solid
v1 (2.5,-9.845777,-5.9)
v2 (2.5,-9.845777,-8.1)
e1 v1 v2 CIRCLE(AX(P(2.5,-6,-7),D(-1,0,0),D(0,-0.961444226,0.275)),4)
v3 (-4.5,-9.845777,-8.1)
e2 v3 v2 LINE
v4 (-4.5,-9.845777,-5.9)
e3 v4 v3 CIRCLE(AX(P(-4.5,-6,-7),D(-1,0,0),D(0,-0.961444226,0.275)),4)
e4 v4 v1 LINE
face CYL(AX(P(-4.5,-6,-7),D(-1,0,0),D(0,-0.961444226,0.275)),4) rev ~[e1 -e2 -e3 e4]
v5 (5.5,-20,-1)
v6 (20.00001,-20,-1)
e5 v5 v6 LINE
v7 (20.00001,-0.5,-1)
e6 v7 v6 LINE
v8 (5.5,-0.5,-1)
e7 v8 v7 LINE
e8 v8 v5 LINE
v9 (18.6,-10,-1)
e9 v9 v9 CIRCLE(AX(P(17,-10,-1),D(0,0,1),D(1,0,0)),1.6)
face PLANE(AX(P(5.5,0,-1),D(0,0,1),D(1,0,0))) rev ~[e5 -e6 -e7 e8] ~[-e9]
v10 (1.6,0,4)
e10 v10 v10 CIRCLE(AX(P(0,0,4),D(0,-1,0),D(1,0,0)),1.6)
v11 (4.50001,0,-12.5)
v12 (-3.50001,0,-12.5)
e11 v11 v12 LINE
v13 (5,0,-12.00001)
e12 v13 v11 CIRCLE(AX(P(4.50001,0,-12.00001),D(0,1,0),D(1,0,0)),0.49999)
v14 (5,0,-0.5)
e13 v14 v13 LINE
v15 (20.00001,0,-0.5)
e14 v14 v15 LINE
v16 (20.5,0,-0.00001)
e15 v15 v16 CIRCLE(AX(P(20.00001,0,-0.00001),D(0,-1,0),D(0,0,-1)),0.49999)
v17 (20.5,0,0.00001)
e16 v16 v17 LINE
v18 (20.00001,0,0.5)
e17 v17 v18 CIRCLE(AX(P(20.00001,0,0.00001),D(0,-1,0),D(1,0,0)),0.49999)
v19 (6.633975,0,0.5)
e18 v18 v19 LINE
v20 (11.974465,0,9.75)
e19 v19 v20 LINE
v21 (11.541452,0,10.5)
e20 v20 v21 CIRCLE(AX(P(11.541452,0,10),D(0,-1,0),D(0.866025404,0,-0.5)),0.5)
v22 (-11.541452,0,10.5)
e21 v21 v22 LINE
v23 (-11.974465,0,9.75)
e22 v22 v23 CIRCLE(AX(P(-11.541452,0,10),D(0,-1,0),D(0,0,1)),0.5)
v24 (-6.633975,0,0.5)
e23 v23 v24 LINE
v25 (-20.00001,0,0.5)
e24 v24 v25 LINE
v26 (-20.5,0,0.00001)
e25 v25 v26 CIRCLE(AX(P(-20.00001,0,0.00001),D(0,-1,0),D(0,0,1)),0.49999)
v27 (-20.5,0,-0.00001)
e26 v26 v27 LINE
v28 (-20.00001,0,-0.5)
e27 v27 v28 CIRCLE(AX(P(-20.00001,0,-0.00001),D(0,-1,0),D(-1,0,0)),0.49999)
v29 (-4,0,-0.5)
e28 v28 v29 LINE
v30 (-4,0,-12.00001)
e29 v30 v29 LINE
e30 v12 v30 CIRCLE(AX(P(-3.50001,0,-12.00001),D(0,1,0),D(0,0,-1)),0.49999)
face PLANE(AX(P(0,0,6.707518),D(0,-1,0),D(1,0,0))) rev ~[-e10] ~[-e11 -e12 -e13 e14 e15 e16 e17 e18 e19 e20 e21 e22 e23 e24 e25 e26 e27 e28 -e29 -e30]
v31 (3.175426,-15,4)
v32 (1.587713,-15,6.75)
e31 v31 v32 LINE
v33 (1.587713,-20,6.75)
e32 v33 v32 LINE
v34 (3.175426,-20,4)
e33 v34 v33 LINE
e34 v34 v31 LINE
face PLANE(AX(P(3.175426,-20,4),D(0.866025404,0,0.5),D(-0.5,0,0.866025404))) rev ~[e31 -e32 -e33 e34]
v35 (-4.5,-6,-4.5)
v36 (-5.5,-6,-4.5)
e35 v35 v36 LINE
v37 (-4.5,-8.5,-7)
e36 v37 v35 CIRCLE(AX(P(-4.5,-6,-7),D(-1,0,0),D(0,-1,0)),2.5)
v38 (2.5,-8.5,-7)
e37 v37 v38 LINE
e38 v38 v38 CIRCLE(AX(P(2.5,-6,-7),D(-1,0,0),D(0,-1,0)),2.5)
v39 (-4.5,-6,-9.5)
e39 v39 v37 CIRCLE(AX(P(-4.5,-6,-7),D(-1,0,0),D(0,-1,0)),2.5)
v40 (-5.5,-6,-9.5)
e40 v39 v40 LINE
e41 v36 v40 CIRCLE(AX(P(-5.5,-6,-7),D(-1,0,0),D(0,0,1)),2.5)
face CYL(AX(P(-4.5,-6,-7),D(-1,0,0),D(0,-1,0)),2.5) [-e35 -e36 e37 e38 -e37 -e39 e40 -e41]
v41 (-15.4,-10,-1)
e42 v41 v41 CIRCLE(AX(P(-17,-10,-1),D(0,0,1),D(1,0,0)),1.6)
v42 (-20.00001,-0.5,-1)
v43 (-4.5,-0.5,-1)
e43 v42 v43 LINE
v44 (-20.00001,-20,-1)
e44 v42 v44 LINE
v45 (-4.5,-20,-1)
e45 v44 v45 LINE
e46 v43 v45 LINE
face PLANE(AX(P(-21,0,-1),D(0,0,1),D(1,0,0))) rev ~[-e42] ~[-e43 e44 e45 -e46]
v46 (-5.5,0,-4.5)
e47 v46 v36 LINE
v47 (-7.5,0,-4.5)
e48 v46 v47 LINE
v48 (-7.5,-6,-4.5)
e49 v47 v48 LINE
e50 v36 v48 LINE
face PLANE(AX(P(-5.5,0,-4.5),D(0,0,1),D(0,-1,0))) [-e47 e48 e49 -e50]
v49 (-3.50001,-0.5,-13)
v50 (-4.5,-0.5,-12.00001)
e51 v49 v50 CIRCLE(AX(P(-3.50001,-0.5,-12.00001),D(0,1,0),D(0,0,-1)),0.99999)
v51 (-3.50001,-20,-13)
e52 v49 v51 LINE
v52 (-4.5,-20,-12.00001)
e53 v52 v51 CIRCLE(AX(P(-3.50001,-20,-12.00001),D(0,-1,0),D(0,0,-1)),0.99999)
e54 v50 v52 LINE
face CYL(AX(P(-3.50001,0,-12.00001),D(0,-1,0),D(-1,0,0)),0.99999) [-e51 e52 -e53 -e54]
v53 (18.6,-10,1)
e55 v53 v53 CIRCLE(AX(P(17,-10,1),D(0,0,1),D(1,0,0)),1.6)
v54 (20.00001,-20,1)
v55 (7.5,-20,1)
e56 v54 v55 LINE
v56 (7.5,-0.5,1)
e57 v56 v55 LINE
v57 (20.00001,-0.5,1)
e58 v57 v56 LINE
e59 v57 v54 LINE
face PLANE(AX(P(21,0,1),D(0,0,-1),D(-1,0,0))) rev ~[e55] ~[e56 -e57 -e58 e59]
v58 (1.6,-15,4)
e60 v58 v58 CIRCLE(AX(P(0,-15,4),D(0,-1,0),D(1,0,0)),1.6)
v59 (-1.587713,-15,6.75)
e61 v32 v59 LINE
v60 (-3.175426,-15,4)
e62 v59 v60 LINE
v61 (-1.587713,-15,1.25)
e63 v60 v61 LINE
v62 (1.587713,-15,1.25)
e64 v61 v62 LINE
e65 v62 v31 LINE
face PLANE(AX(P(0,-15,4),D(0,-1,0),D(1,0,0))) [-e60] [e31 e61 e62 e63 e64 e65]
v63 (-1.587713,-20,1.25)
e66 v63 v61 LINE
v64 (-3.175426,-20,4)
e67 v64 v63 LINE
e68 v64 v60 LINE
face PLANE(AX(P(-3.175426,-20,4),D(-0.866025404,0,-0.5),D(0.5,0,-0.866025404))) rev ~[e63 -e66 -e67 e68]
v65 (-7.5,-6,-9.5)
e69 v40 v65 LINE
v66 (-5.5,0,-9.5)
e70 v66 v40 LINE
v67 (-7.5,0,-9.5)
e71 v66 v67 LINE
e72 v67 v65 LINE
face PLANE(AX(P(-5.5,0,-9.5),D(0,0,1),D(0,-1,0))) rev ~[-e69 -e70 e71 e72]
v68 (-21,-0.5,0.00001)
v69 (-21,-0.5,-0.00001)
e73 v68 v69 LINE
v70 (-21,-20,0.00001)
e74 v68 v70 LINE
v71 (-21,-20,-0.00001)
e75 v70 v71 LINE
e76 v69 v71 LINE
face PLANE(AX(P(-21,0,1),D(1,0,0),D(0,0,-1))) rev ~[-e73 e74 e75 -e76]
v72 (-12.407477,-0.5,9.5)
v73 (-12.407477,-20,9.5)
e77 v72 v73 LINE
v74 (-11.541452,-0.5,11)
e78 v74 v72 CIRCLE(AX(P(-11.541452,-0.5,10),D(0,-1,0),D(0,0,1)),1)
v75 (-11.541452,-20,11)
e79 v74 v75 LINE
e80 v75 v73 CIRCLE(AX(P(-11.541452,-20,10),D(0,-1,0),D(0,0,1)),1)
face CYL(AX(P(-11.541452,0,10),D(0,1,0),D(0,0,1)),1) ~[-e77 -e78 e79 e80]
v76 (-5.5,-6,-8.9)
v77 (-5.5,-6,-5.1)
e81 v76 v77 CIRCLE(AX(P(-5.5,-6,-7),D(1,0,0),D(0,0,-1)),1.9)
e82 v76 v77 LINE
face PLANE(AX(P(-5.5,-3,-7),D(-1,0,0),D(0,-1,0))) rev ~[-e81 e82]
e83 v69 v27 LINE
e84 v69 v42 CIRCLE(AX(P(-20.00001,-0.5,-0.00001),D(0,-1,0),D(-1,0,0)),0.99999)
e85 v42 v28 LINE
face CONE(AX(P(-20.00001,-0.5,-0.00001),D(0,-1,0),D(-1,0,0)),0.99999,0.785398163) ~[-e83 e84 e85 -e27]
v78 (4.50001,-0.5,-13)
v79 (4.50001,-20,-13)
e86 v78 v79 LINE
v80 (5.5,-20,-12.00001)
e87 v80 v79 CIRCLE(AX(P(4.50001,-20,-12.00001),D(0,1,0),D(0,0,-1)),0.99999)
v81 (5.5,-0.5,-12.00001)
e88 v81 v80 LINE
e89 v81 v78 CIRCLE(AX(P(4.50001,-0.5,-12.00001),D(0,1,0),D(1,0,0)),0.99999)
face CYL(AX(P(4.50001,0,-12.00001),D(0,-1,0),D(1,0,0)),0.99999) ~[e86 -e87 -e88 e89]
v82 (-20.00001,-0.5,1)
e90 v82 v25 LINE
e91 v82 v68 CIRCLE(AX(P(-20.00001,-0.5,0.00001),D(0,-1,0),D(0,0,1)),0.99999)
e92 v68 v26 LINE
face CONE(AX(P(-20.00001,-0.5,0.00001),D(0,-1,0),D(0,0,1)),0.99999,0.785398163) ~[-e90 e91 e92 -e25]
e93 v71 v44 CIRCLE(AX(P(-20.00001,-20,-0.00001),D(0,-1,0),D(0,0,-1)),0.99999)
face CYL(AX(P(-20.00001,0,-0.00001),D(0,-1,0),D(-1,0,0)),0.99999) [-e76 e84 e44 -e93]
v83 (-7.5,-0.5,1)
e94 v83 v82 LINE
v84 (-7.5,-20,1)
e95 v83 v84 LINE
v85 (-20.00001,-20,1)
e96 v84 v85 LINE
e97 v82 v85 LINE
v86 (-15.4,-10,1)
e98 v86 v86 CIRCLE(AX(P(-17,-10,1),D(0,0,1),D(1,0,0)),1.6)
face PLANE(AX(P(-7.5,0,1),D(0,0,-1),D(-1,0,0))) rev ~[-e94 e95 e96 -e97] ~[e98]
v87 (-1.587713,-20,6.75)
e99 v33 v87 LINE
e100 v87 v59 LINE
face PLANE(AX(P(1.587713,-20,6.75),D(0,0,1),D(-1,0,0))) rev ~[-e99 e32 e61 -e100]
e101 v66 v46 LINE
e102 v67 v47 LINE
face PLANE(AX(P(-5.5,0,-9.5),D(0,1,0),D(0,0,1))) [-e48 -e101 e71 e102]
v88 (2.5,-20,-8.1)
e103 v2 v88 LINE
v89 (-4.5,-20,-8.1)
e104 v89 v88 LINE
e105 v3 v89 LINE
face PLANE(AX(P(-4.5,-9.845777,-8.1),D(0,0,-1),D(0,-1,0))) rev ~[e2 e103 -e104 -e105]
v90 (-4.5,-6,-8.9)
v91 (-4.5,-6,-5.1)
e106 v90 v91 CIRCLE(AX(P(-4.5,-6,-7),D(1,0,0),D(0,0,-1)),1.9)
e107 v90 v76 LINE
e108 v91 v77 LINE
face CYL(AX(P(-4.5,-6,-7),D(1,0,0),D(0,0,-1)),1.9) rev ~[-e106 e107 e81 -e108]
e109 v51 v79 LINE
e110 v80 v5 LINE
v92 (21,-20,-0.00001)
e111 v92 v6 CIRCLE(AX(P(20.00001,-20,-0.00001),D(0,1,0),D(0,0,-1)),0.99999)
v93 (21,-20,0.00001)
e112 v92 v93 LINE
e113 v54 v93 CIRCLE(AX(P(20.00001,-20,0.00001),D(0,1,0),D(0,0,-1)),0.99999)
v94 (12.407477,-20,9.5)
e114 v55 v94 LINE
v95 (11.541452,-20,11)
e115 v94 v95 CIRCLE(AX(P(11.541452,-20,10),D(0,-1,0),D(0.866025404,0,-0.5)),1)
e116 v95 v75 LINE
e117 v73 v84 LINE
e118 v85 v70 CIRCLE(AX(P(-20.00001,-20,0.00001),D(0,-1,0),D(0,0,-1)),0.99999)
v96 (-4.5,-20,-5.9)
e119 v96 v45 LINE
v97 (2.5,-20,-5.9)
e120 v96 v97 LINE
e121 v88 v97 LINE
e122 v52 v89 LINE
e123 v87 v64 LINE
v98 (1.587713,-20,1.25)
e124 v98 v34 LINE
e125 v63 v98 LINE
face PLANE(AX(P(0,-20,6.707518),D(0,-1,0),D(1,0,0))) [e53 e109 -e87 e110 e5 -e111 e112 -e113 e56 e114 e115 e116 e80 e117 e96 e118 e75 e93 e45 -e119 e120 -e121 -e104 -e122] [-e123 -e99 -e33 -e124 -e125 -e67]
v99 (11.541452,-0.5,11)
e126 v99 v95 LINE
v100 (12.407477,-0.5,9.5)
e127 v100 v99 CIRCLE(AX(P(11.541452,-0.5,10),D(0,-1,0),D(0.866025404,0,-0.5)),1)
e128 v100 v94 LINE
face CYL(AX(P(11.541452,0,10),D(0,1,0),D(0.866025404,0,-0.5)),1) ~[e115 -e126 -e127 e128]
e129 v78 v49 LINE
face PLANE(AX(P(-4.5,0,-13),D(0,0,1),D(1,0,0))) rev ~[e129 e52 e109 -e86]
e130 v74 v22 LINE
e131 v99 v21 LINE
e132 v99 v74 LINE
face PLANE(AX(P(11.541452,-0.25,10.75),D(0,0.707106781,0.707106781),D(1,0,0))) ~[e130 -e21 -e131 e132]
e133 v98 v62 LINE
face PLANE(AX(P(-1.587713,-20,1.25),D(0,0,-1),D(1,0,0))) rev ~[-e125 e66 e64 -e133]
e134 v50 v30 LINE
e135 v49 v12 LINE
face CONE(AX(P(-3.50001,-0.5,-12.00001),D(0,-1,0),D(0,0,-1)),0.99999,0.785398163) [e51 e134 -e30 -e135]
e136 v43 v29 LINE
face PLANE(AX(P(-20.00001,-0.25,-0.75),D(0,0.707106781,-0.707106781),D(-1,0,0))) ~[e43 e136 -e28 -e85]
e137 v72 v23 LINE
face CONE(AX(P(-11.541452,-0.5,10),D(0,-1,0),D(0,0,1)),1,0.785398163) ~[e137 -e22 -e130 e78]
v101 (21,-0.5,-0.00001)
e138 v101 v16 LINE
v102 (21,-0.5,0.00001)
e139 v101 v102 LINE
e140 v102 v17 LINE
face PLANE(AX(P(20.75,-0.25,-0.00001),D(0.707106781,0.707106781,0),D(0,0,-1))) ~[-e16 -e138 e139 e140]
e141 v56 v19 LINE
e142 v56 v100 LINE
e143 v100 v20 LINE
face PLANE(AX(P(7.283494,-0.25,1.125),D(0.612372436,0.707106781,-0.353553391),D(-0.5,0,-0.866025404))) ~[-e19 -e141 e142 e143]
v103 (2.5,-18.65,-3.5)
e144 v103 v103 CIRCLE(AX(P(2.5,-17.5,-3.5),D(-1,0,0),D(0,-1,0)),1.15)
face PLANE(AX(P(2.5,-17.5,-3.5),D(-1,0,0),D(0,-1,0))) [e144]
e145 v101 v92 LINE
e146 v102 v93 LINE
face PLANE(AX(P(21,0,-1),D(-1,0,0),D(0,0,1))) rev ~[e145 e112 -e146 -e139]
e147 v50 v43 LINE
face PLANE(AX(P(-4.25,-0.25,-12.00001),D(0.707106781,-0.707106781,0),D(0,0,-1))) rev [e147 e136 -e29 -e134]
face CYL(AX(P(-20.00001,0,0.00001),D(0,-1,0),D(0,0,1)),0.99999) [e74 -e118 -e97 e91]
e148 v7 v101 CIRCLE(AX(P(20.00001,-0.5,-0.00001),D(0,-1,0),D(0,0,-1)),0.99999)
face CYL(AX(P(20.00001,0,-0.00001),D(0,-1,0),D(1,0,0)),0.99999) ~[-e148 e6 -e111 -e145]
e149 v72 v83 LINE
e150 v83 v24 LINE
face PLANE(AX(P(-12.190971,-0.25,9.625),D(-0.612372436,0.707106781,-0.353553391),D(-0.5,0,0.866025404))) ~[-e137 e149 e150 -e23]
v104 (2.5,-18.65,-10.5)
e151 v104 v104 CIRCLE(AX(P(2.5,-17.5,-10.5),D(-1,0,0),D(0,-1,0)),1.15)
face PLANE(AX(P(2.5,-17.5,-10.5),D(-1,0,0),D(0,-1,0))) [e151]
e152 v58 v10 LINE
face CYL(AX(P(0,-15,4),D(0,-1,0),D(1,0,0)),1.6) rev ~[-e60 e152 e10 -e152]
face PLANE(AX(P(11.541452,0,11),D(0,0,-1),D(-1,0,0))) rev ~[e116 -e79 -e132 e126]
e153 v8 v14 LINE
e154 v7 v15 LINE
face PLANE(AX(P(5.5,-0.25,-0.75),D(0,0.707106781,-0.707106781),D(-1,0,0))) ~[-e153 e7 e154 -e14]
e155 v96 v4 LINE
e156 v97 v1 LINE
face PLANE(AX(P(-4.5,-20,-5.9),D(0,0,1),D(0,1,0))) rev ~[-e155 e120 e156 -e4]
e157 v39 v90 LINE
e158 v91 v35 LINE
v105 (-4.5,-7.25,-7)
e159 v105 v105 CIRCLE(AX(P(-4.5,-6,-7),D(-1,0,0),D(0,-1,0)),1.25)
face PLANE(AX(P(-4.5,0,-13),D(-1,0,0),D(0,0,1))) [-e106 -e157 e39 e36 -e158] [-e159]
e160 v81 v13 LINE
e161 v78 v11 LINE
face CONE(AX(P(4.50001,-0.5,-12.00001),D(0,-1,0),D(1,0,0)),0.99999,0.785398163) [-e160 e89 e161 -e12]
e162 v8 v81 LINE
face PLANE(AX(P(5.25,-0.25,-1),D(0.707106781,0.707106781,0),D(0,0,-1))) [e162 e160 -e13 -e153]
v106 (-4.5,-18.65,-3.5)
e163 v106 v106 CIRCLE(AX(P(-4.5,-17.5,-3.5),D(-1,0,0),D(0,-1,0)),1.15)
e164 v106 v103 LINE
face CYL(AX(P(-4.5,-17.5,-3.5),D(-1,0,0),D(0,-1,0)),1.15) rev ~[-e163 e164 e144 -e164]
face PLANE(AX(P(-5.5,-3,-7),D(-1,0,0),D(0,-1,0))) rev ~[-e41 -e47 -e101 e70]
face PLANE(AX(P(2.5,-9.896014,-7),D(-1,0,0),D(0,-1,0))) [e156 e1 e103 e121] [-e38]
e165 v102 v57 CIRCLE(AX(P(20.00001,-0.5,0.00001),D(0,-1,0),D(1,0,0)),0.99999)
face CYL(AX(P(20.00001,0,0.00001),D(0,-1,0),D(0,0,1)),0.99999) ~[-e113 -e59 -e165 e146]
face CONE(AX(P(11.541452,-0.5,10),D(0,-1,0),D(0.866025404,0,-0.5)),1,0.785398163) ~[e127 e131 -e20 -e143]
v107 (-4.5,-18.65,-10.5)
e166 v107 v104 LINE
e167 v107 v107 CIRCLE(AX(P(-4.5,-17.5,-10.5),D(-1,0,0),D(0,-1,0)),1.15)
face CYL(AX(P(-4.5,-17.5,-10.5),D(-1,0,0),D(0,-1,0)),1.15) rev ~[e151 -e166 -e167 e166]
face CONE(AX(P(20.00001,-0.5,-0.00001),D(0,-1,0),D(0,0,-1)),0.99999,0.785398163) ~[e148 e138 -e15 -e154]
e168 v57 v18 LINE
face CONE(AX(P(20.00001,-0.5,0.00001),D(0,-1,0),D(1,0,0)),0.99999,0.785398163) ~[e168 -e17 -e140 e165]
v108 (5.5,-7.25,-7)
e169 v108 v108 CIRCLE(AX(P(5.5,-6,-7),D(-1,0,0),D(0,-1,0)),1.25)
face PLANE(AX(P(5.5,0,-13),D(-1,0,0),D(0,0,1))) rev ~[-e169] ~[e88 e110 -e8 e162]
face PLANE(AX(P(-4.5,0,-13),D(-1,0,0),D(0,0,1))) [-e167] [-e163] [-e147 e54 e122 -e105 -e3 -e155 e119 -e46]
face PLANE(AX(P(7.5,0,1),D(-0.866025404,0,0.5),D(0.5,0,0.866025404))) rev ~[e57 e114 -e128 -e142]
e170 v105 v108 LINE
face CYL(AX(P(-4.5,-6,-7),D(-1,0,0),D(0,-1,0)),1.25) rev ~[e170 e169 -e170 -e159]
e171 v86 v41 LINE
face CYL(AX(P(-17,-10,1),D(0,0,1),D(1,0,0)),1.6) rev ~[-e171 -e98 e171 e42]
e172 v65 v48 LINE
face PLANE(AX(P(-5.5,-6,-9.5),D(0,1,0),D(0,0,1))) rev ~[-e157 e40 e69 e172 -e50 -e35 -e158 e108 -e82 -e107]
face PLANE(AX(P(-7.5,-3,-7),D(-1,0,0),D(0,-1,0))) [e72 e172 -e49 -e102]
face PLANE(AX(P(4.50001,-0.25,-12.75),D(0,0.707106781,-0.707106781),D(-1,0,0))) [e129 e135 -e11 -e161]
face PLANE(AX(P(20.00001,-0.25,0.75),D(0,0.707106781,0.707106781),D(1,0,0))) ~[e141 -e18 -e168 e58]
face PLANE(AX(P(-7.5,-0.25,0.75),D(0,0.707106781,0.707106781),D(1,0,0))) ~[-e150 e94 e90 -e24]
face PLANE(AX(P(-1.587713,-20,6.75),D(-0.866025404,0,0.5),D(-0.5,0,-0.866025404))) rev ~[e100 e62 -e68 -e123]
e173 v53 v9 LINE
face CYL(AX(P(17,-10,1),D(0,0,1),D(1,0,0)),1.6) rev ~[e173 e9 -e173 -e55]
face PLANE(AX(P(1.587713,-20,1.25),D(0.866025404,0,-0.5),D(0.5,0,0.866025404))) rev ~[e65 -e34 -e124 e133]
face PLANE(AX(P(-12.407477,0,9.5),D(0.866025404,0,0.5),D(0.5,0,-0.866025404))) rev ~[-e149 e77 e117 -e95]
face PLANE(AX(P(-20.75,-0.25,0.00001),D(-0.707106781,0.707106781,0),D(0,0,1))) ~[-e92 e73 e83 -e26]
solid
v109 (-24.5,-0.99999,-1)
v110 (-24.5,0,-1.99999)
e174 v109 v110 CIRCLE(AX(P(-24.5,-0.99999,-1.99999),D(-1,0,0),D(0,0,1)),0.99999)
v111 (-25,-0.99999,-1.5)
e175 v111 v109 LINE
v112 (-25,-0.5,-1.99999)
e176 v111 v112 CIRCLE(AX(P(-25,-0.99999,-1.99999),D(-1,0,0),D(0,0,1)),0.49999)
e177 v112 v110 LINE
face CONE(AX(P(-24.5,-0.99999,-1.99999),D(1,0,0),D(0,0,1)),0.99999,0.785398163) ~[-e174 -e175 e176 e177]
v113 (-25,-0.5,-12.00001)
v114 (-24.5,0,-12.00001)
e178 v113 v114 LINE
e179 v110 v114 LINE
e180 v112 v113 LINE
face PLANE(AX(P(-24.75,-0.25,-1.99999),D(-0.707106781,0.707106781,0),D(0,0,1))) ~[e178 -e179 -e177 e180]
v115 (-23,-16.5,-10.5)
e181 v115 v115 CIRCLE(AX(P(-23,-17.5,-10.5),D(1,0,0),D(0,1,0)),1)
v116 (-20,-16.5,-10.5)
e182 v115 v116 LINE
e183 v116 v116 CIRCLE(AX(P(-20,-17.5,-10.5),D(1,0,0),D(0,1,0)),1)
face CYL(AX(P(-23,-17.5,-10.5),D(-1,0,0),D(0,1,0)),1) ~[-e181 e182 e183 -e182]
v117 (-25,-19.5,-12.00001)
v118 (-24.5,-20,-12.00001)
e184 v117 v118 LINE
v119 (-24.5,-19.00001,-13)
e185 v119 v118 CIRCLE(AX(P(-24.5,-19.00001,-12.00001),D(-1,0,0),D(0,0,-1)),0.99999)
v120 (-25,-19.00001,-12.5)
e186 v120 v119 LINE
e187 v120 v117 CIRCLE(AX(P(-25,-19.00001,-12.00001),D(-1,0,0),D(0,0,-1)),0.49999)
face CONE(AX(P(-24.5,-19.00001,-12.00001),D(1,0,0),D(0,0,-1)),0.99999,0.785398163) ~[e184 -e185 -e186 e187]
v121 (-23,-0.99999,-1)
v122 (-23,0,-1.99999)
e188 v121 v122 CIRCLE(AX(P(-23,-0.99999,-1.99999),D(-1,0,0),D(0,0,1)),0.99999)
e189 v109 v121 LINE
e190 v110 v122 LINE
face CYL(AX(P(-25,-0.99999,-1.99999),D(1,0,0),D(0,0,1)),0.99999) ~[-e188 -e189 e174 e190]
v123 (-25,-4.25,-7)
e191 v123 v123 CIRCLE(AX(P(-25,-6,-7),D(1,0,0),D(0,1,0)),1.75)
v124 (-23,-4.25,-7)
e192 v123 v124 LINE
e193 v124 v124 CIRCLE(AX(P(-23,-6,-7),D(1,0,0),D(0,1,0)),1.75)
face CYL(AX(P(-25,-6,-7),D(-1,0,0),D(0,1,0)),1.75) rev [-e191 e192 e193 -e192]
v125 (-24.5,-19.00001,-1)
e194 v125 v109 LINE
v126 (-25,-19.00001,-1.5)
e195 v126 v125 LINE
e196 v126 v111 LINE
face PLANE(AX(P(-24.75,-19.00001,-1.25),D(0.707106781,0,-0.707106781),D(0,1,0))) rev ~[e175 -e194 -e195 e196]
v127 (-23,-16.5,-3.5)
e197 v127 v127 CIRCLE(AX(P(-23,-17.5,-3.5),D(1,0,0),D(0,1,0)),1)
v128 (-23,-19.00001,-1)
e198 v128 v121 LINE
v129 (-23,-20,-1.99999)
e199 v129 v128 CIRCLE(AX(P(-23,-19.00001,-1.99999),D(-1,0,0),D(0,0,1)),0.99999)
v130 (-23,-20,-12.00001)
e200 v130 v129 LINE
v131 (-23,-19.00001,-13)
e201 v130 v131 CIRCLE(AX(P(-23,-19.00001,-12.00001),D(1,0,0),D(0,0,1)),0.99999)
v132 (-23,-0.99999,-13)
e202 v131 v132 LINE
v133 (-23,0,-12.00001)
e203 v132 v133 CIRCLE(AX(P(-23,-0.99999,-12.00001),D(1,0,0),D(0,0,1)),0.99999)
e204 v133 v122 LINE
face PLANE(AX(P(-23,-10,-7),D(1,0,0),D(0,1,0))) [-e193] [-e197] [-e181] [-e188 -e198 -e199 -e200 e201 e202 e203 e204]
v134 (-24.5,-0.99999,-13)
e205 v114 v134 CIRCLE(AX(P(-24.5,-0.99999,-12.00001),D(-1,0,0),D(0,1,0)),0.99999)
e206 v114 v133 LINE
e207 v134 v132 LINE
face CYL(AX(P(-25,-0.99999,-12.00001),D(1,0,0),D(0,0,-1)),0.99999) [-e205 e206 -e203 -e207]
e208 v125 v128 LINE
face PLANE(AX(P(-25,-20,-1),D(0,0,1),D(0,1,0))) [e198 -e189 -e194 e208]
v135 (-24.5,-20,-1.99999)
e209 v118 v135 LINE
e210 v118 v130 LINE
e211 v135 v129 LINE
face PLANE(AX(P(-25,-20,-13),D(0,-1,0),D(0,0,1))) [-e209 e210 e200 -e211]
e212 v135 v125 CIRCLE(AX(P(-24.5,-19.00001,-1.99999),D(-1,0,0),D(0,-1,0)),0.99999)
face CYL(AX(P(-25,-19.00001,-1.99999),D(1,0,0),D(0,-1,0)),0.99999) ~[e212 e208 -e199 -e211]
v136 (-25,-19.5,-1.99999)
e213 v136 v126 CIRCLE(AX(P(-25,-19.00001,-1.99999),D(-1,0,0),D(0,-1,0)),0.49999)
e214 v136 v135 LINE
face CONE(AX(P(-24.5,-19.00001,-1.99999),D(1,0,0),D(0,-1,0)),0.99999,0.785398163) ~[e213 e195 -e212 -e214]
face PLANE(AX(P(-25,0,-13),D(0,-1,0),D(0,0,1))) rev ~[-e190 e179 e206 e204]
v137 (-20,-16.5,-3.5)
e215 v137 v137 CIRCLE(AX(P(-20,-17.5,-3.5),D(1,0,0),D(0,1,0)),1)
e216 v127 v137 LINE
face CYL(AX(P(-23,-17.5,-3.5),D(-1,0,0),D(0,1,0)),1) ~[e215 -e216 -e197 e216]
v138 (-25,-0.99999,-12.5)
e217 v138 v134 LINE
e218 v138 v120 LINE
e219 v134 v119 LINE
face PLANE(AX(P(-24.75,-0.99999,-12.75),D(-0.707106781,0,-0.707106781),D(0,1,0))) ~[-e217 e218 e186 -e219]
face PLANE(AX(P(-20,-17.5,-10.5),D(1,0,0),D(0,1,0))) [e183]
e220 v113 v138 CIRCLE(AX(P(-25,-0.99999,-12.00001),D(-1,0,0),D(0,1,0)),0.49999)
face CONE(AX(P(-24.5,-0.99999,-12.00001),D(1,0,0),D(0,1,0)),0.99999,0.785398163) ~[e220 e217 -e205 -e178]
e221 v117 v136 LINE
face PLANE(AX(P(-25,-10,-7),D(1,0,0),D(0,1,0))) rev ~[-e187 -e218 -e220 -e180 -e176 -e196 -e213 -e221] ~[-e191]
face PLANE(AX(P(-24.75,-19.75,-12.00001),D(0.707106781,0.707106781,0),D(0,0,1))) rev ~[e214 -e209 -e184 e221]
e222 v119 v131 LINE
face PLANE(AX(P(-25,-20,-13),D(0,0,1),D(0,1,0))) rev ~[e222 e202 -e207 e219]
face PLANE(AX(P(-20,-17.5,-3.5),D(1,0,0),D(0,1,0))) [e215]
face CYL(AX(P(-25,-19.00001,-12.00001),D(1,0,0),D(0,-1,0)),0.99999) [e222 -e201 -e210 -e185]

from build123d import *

# Parameters (mm, degrees)
F0_W       = 10
F0_H       = 12
F1_DEPTH   = 20
F2_R       = 2.5
F2_R_2     = 1.15
F3_DEPTH   = 7
F4_R       = 1.25
F5_DEPTH   = 25.501
F7_DEPTH   = 1
F8_W       = 6
F8_H       = 5
F9_DEPTH   = 2
F11_W      = 20
F11_H      = 12
F11_R      = 1.75
F12_DEPTH  = 2
F13_R      = 1
F14_DEPTH  = 3
F15_R      = 1.6
F16_DEPTH  = 14.001
F18_DEPTH  = 5
F19_R      = 1.6
F20_DEPTH  = 15.001
F21_R      = 0.99999
F21_2_R    = 0.99999
F22_SIZE   = 0.5
F22_2_SIZE = 0.5


# Not quite as in the source:
# - a fillet or chamfer is up to 0.001 mm smaller than in the source, because OpenCascade refuses the exact size


with BuildPart() as f1:
    # F0 (on Front) → F1 (new body)
    with BuildSketch(Plane.XZ):
        with BuildLine():
            Line((-12.4074772881, 9.5), (-7.5, 1))
            Line((-7.5, 1), (7.5, 1))
            Line((7.5, 1), (12.4074772881, 9.5))
            ThreePointArc((12.4074772881, 9.5), (12.4074772881, 10.5), (11.5414518843, 11))
            Line((11.5414518843, 11), (-11.5414518843, 11))
            ThreePointArc((-11.5414518843, 11), (-12.4074772881, 10.5), (-12.4074772881, 9.5))
        make_face()
        Polygon((7.5, 1), (-7.5, 1), (-21, 1), (-21, -1), (-4.5, -1), (5.5, -1), (21, -1), (21, 1), align=None)
        with Locations((0.5, -7)):
            Rectangle(F0_W, F0_H)
    extrude(amount=F1_DEPTH)

    # F2 (on face) → F3 (cut)
    with BuildSketch(Plane(origin=(-4.5, 0, 0), x_dir=(0, -1, 0), z_dir=(-1, 0, 0))):
        with BuildLine():
            ThreePointArc((9.8457769046, -8.1), (9.9612565947, -7.5553793215), (10, -7))
            ThreePointArc((10, -7), (9.9612565947, -6.4446206785), (9.8457769046, -5.9))
            Line((9.8457769046, -5.9), (9.8457769046, -8.1))
        make_face()
        with BuildLine():
            ThreePointArc((9.8457769046, -5.9), (9.9612565947, -6.4446206785), (10, -7))
            ThreePointArc((10, -7), (9.9612565947, -7.5553793215), (9.8457769046, -8.1))
            Line((9.8457769046, -8.1), (20, -8.1))
            Line((20, -8.1), (20, -5.9))
            Line((20, -5.9), (9.8457769046, -5.9))
        make_face()
        with BuildLine():
            Line((9.8457769046, -8.1), (9.8457769046, -5.9))
            ThreePointArc((9.8457769046, -5.9), (2, -7), (9.8457769046, -8.1))
        make_face()
        with Locations((6, -7)):
            Circle(F2_R, mode=Mode.SUBTRACT)
        with Locations((17.5, -10.5)):
            Circle(F2_R_2)
        with Locations((17.5, -3.5)):
            Circle(F2_R_2)
    extrude(amount=-F3_DEPTH, mode=Mode.SUBTRACT)

    # F4 (on face) → F5 (cut, through all)
    with BuildSketch(Plane(origin=(-4.5, 0, 0), x_dir=(0, -1, 0), z_dir=(-1, 0, 0))):
        with Locations((6, -7)):
            Circle(F4_R)
    extrude(amount=-F5_DEPTH, mode=Mode.SUBTRACT)

    # F6 (on face) → F7 (join)
    with BuildSketch(Plane(origin=(-4.5, 0, 0), x_dir=(0, -1, 0), z_dir=(-1, 0, 0))):
        with BuildLine():
            Line((6, -5.1), (6, -4.5))
            ThreePointArc((6, -4.5), (3.5, -7), (6, -9.5))
            Line((6, -9.5), (6, -8.9))
            ThreePointArc((6, -8.9), (4.1, -7), (6, -5.1))
        make_face()
    extrude(amount=F7_DEPTH)

    # F8 (on face) → F9 (join)
    with BuildSketch(Plane(origin=(-5.5, 0, 0), x_dir=(0, -1, 0), z_dir=(-1, 0, 0))):
        with Locations((3, -7)):
            Rectangle(F8_W, F8_H)
    extrude(amount=F9_DEPTH)

    # F15 (on face) → F16 (cut, through all)
    with BuildSketch(Plane.XY.offset(1)):
        with Locations((17, -10)):
            Circle(F15_R)
        with Locations((-17, -10)):
            Circle(F15_R)
    extrude(amount=-F16_DEPTH, mode=Mode.SUBTRACT)

    # F17 (on face) → F18 (cut)
    with BuildSketch(Plane.XZ.offset(20)):
        Polygon((-1.5877132403, 1.25), (1.5877132403, 1.25), (3.1754264805, 4), (1.5877132403, 6.75), (-1.5877132403, 6.75), (-3.1754264805, 4), align=None)
    extrude(amount=-F18_DEPTH, mode=Mode.SUBTRACT)

    # F19 (on face) → F20 (cut, through all)
    with BuildSketch(Plane.XZ.offset(15)):
        with Locations((0, 4)):
            Circle(F19_R)
    extrude(amount=-F20_DEPTH, mode=Mode.SUBTRACT)

    # F21 (radius 1 in the source; OpenCascade refuses exactly that, so slightly less here)
    f21_edges = [f1.edges().sort_by_distance(p)[0] for p in [
        (5.5, -10, -13),
        (21, -10, -1),
        (21, -10, 1),
        (-21, -10, -1),
        (-21, -10, 1),
        (-4.5, -10, -13),
    ]]
    fillet(f21_edges, radius=F21_R)

    # F22
    f22_edges = [f1.edges().sort_by_distance(p)[0] for p in [
        (-4.5, 0, -6.500005),
        (-12.250005, 0, -1),
        (-9.953739, 0, 5.25),
        (12.750005, 0, -1),
    ]]
    chamfer(f22_edges, length=F22_SIZE)


with BuildPart() as f12:
    # F11 (on offset) → F12 (new body)
    with BuildSketch(Plane.YZ.offset(-25)):
        with Locations((-10, -7)):
            Rectangle(F11_W, F11_H)
        with Locations((-6, -7)):
            Circle(F11_R, mode=Mode.SUBTRACT)
    extrude(amount=F12_DEPTH)

    # F13 (on face) → F14 (join)
    with BuildSketch(Plane.YZ.offset(-23)):
        with Locations((-17.5, -10.5)):
            Circle(F13_R)
        with Locations((-17.5, -3.5)):
            Circle(F13_R)
    extrude(amount=F14_DEPTH)

    # F21#2 (radius 1 in the source; OpenCascade refuses exactly that, so slightly less here)
    f21_2_edges = [f12.edges().sort_by_distance(p)[0] for p in [
        (-24, -20, -1),
        (-24, 0, -1),
        (-24, -20, -13),
        (-24, 0, -13),
    ]]
    fillet(f21_2_edges, radius=F21_2_R)

    # F22#2
    f22_2_edges = [f12.edges().sort_by_distance(p)[0] for p in [
        (-25, -10, -1),
    ]]
    chamfer(f22_2_edges, length=F22_2_SIZE)


solid = Compound([f1.part, f12.part])
